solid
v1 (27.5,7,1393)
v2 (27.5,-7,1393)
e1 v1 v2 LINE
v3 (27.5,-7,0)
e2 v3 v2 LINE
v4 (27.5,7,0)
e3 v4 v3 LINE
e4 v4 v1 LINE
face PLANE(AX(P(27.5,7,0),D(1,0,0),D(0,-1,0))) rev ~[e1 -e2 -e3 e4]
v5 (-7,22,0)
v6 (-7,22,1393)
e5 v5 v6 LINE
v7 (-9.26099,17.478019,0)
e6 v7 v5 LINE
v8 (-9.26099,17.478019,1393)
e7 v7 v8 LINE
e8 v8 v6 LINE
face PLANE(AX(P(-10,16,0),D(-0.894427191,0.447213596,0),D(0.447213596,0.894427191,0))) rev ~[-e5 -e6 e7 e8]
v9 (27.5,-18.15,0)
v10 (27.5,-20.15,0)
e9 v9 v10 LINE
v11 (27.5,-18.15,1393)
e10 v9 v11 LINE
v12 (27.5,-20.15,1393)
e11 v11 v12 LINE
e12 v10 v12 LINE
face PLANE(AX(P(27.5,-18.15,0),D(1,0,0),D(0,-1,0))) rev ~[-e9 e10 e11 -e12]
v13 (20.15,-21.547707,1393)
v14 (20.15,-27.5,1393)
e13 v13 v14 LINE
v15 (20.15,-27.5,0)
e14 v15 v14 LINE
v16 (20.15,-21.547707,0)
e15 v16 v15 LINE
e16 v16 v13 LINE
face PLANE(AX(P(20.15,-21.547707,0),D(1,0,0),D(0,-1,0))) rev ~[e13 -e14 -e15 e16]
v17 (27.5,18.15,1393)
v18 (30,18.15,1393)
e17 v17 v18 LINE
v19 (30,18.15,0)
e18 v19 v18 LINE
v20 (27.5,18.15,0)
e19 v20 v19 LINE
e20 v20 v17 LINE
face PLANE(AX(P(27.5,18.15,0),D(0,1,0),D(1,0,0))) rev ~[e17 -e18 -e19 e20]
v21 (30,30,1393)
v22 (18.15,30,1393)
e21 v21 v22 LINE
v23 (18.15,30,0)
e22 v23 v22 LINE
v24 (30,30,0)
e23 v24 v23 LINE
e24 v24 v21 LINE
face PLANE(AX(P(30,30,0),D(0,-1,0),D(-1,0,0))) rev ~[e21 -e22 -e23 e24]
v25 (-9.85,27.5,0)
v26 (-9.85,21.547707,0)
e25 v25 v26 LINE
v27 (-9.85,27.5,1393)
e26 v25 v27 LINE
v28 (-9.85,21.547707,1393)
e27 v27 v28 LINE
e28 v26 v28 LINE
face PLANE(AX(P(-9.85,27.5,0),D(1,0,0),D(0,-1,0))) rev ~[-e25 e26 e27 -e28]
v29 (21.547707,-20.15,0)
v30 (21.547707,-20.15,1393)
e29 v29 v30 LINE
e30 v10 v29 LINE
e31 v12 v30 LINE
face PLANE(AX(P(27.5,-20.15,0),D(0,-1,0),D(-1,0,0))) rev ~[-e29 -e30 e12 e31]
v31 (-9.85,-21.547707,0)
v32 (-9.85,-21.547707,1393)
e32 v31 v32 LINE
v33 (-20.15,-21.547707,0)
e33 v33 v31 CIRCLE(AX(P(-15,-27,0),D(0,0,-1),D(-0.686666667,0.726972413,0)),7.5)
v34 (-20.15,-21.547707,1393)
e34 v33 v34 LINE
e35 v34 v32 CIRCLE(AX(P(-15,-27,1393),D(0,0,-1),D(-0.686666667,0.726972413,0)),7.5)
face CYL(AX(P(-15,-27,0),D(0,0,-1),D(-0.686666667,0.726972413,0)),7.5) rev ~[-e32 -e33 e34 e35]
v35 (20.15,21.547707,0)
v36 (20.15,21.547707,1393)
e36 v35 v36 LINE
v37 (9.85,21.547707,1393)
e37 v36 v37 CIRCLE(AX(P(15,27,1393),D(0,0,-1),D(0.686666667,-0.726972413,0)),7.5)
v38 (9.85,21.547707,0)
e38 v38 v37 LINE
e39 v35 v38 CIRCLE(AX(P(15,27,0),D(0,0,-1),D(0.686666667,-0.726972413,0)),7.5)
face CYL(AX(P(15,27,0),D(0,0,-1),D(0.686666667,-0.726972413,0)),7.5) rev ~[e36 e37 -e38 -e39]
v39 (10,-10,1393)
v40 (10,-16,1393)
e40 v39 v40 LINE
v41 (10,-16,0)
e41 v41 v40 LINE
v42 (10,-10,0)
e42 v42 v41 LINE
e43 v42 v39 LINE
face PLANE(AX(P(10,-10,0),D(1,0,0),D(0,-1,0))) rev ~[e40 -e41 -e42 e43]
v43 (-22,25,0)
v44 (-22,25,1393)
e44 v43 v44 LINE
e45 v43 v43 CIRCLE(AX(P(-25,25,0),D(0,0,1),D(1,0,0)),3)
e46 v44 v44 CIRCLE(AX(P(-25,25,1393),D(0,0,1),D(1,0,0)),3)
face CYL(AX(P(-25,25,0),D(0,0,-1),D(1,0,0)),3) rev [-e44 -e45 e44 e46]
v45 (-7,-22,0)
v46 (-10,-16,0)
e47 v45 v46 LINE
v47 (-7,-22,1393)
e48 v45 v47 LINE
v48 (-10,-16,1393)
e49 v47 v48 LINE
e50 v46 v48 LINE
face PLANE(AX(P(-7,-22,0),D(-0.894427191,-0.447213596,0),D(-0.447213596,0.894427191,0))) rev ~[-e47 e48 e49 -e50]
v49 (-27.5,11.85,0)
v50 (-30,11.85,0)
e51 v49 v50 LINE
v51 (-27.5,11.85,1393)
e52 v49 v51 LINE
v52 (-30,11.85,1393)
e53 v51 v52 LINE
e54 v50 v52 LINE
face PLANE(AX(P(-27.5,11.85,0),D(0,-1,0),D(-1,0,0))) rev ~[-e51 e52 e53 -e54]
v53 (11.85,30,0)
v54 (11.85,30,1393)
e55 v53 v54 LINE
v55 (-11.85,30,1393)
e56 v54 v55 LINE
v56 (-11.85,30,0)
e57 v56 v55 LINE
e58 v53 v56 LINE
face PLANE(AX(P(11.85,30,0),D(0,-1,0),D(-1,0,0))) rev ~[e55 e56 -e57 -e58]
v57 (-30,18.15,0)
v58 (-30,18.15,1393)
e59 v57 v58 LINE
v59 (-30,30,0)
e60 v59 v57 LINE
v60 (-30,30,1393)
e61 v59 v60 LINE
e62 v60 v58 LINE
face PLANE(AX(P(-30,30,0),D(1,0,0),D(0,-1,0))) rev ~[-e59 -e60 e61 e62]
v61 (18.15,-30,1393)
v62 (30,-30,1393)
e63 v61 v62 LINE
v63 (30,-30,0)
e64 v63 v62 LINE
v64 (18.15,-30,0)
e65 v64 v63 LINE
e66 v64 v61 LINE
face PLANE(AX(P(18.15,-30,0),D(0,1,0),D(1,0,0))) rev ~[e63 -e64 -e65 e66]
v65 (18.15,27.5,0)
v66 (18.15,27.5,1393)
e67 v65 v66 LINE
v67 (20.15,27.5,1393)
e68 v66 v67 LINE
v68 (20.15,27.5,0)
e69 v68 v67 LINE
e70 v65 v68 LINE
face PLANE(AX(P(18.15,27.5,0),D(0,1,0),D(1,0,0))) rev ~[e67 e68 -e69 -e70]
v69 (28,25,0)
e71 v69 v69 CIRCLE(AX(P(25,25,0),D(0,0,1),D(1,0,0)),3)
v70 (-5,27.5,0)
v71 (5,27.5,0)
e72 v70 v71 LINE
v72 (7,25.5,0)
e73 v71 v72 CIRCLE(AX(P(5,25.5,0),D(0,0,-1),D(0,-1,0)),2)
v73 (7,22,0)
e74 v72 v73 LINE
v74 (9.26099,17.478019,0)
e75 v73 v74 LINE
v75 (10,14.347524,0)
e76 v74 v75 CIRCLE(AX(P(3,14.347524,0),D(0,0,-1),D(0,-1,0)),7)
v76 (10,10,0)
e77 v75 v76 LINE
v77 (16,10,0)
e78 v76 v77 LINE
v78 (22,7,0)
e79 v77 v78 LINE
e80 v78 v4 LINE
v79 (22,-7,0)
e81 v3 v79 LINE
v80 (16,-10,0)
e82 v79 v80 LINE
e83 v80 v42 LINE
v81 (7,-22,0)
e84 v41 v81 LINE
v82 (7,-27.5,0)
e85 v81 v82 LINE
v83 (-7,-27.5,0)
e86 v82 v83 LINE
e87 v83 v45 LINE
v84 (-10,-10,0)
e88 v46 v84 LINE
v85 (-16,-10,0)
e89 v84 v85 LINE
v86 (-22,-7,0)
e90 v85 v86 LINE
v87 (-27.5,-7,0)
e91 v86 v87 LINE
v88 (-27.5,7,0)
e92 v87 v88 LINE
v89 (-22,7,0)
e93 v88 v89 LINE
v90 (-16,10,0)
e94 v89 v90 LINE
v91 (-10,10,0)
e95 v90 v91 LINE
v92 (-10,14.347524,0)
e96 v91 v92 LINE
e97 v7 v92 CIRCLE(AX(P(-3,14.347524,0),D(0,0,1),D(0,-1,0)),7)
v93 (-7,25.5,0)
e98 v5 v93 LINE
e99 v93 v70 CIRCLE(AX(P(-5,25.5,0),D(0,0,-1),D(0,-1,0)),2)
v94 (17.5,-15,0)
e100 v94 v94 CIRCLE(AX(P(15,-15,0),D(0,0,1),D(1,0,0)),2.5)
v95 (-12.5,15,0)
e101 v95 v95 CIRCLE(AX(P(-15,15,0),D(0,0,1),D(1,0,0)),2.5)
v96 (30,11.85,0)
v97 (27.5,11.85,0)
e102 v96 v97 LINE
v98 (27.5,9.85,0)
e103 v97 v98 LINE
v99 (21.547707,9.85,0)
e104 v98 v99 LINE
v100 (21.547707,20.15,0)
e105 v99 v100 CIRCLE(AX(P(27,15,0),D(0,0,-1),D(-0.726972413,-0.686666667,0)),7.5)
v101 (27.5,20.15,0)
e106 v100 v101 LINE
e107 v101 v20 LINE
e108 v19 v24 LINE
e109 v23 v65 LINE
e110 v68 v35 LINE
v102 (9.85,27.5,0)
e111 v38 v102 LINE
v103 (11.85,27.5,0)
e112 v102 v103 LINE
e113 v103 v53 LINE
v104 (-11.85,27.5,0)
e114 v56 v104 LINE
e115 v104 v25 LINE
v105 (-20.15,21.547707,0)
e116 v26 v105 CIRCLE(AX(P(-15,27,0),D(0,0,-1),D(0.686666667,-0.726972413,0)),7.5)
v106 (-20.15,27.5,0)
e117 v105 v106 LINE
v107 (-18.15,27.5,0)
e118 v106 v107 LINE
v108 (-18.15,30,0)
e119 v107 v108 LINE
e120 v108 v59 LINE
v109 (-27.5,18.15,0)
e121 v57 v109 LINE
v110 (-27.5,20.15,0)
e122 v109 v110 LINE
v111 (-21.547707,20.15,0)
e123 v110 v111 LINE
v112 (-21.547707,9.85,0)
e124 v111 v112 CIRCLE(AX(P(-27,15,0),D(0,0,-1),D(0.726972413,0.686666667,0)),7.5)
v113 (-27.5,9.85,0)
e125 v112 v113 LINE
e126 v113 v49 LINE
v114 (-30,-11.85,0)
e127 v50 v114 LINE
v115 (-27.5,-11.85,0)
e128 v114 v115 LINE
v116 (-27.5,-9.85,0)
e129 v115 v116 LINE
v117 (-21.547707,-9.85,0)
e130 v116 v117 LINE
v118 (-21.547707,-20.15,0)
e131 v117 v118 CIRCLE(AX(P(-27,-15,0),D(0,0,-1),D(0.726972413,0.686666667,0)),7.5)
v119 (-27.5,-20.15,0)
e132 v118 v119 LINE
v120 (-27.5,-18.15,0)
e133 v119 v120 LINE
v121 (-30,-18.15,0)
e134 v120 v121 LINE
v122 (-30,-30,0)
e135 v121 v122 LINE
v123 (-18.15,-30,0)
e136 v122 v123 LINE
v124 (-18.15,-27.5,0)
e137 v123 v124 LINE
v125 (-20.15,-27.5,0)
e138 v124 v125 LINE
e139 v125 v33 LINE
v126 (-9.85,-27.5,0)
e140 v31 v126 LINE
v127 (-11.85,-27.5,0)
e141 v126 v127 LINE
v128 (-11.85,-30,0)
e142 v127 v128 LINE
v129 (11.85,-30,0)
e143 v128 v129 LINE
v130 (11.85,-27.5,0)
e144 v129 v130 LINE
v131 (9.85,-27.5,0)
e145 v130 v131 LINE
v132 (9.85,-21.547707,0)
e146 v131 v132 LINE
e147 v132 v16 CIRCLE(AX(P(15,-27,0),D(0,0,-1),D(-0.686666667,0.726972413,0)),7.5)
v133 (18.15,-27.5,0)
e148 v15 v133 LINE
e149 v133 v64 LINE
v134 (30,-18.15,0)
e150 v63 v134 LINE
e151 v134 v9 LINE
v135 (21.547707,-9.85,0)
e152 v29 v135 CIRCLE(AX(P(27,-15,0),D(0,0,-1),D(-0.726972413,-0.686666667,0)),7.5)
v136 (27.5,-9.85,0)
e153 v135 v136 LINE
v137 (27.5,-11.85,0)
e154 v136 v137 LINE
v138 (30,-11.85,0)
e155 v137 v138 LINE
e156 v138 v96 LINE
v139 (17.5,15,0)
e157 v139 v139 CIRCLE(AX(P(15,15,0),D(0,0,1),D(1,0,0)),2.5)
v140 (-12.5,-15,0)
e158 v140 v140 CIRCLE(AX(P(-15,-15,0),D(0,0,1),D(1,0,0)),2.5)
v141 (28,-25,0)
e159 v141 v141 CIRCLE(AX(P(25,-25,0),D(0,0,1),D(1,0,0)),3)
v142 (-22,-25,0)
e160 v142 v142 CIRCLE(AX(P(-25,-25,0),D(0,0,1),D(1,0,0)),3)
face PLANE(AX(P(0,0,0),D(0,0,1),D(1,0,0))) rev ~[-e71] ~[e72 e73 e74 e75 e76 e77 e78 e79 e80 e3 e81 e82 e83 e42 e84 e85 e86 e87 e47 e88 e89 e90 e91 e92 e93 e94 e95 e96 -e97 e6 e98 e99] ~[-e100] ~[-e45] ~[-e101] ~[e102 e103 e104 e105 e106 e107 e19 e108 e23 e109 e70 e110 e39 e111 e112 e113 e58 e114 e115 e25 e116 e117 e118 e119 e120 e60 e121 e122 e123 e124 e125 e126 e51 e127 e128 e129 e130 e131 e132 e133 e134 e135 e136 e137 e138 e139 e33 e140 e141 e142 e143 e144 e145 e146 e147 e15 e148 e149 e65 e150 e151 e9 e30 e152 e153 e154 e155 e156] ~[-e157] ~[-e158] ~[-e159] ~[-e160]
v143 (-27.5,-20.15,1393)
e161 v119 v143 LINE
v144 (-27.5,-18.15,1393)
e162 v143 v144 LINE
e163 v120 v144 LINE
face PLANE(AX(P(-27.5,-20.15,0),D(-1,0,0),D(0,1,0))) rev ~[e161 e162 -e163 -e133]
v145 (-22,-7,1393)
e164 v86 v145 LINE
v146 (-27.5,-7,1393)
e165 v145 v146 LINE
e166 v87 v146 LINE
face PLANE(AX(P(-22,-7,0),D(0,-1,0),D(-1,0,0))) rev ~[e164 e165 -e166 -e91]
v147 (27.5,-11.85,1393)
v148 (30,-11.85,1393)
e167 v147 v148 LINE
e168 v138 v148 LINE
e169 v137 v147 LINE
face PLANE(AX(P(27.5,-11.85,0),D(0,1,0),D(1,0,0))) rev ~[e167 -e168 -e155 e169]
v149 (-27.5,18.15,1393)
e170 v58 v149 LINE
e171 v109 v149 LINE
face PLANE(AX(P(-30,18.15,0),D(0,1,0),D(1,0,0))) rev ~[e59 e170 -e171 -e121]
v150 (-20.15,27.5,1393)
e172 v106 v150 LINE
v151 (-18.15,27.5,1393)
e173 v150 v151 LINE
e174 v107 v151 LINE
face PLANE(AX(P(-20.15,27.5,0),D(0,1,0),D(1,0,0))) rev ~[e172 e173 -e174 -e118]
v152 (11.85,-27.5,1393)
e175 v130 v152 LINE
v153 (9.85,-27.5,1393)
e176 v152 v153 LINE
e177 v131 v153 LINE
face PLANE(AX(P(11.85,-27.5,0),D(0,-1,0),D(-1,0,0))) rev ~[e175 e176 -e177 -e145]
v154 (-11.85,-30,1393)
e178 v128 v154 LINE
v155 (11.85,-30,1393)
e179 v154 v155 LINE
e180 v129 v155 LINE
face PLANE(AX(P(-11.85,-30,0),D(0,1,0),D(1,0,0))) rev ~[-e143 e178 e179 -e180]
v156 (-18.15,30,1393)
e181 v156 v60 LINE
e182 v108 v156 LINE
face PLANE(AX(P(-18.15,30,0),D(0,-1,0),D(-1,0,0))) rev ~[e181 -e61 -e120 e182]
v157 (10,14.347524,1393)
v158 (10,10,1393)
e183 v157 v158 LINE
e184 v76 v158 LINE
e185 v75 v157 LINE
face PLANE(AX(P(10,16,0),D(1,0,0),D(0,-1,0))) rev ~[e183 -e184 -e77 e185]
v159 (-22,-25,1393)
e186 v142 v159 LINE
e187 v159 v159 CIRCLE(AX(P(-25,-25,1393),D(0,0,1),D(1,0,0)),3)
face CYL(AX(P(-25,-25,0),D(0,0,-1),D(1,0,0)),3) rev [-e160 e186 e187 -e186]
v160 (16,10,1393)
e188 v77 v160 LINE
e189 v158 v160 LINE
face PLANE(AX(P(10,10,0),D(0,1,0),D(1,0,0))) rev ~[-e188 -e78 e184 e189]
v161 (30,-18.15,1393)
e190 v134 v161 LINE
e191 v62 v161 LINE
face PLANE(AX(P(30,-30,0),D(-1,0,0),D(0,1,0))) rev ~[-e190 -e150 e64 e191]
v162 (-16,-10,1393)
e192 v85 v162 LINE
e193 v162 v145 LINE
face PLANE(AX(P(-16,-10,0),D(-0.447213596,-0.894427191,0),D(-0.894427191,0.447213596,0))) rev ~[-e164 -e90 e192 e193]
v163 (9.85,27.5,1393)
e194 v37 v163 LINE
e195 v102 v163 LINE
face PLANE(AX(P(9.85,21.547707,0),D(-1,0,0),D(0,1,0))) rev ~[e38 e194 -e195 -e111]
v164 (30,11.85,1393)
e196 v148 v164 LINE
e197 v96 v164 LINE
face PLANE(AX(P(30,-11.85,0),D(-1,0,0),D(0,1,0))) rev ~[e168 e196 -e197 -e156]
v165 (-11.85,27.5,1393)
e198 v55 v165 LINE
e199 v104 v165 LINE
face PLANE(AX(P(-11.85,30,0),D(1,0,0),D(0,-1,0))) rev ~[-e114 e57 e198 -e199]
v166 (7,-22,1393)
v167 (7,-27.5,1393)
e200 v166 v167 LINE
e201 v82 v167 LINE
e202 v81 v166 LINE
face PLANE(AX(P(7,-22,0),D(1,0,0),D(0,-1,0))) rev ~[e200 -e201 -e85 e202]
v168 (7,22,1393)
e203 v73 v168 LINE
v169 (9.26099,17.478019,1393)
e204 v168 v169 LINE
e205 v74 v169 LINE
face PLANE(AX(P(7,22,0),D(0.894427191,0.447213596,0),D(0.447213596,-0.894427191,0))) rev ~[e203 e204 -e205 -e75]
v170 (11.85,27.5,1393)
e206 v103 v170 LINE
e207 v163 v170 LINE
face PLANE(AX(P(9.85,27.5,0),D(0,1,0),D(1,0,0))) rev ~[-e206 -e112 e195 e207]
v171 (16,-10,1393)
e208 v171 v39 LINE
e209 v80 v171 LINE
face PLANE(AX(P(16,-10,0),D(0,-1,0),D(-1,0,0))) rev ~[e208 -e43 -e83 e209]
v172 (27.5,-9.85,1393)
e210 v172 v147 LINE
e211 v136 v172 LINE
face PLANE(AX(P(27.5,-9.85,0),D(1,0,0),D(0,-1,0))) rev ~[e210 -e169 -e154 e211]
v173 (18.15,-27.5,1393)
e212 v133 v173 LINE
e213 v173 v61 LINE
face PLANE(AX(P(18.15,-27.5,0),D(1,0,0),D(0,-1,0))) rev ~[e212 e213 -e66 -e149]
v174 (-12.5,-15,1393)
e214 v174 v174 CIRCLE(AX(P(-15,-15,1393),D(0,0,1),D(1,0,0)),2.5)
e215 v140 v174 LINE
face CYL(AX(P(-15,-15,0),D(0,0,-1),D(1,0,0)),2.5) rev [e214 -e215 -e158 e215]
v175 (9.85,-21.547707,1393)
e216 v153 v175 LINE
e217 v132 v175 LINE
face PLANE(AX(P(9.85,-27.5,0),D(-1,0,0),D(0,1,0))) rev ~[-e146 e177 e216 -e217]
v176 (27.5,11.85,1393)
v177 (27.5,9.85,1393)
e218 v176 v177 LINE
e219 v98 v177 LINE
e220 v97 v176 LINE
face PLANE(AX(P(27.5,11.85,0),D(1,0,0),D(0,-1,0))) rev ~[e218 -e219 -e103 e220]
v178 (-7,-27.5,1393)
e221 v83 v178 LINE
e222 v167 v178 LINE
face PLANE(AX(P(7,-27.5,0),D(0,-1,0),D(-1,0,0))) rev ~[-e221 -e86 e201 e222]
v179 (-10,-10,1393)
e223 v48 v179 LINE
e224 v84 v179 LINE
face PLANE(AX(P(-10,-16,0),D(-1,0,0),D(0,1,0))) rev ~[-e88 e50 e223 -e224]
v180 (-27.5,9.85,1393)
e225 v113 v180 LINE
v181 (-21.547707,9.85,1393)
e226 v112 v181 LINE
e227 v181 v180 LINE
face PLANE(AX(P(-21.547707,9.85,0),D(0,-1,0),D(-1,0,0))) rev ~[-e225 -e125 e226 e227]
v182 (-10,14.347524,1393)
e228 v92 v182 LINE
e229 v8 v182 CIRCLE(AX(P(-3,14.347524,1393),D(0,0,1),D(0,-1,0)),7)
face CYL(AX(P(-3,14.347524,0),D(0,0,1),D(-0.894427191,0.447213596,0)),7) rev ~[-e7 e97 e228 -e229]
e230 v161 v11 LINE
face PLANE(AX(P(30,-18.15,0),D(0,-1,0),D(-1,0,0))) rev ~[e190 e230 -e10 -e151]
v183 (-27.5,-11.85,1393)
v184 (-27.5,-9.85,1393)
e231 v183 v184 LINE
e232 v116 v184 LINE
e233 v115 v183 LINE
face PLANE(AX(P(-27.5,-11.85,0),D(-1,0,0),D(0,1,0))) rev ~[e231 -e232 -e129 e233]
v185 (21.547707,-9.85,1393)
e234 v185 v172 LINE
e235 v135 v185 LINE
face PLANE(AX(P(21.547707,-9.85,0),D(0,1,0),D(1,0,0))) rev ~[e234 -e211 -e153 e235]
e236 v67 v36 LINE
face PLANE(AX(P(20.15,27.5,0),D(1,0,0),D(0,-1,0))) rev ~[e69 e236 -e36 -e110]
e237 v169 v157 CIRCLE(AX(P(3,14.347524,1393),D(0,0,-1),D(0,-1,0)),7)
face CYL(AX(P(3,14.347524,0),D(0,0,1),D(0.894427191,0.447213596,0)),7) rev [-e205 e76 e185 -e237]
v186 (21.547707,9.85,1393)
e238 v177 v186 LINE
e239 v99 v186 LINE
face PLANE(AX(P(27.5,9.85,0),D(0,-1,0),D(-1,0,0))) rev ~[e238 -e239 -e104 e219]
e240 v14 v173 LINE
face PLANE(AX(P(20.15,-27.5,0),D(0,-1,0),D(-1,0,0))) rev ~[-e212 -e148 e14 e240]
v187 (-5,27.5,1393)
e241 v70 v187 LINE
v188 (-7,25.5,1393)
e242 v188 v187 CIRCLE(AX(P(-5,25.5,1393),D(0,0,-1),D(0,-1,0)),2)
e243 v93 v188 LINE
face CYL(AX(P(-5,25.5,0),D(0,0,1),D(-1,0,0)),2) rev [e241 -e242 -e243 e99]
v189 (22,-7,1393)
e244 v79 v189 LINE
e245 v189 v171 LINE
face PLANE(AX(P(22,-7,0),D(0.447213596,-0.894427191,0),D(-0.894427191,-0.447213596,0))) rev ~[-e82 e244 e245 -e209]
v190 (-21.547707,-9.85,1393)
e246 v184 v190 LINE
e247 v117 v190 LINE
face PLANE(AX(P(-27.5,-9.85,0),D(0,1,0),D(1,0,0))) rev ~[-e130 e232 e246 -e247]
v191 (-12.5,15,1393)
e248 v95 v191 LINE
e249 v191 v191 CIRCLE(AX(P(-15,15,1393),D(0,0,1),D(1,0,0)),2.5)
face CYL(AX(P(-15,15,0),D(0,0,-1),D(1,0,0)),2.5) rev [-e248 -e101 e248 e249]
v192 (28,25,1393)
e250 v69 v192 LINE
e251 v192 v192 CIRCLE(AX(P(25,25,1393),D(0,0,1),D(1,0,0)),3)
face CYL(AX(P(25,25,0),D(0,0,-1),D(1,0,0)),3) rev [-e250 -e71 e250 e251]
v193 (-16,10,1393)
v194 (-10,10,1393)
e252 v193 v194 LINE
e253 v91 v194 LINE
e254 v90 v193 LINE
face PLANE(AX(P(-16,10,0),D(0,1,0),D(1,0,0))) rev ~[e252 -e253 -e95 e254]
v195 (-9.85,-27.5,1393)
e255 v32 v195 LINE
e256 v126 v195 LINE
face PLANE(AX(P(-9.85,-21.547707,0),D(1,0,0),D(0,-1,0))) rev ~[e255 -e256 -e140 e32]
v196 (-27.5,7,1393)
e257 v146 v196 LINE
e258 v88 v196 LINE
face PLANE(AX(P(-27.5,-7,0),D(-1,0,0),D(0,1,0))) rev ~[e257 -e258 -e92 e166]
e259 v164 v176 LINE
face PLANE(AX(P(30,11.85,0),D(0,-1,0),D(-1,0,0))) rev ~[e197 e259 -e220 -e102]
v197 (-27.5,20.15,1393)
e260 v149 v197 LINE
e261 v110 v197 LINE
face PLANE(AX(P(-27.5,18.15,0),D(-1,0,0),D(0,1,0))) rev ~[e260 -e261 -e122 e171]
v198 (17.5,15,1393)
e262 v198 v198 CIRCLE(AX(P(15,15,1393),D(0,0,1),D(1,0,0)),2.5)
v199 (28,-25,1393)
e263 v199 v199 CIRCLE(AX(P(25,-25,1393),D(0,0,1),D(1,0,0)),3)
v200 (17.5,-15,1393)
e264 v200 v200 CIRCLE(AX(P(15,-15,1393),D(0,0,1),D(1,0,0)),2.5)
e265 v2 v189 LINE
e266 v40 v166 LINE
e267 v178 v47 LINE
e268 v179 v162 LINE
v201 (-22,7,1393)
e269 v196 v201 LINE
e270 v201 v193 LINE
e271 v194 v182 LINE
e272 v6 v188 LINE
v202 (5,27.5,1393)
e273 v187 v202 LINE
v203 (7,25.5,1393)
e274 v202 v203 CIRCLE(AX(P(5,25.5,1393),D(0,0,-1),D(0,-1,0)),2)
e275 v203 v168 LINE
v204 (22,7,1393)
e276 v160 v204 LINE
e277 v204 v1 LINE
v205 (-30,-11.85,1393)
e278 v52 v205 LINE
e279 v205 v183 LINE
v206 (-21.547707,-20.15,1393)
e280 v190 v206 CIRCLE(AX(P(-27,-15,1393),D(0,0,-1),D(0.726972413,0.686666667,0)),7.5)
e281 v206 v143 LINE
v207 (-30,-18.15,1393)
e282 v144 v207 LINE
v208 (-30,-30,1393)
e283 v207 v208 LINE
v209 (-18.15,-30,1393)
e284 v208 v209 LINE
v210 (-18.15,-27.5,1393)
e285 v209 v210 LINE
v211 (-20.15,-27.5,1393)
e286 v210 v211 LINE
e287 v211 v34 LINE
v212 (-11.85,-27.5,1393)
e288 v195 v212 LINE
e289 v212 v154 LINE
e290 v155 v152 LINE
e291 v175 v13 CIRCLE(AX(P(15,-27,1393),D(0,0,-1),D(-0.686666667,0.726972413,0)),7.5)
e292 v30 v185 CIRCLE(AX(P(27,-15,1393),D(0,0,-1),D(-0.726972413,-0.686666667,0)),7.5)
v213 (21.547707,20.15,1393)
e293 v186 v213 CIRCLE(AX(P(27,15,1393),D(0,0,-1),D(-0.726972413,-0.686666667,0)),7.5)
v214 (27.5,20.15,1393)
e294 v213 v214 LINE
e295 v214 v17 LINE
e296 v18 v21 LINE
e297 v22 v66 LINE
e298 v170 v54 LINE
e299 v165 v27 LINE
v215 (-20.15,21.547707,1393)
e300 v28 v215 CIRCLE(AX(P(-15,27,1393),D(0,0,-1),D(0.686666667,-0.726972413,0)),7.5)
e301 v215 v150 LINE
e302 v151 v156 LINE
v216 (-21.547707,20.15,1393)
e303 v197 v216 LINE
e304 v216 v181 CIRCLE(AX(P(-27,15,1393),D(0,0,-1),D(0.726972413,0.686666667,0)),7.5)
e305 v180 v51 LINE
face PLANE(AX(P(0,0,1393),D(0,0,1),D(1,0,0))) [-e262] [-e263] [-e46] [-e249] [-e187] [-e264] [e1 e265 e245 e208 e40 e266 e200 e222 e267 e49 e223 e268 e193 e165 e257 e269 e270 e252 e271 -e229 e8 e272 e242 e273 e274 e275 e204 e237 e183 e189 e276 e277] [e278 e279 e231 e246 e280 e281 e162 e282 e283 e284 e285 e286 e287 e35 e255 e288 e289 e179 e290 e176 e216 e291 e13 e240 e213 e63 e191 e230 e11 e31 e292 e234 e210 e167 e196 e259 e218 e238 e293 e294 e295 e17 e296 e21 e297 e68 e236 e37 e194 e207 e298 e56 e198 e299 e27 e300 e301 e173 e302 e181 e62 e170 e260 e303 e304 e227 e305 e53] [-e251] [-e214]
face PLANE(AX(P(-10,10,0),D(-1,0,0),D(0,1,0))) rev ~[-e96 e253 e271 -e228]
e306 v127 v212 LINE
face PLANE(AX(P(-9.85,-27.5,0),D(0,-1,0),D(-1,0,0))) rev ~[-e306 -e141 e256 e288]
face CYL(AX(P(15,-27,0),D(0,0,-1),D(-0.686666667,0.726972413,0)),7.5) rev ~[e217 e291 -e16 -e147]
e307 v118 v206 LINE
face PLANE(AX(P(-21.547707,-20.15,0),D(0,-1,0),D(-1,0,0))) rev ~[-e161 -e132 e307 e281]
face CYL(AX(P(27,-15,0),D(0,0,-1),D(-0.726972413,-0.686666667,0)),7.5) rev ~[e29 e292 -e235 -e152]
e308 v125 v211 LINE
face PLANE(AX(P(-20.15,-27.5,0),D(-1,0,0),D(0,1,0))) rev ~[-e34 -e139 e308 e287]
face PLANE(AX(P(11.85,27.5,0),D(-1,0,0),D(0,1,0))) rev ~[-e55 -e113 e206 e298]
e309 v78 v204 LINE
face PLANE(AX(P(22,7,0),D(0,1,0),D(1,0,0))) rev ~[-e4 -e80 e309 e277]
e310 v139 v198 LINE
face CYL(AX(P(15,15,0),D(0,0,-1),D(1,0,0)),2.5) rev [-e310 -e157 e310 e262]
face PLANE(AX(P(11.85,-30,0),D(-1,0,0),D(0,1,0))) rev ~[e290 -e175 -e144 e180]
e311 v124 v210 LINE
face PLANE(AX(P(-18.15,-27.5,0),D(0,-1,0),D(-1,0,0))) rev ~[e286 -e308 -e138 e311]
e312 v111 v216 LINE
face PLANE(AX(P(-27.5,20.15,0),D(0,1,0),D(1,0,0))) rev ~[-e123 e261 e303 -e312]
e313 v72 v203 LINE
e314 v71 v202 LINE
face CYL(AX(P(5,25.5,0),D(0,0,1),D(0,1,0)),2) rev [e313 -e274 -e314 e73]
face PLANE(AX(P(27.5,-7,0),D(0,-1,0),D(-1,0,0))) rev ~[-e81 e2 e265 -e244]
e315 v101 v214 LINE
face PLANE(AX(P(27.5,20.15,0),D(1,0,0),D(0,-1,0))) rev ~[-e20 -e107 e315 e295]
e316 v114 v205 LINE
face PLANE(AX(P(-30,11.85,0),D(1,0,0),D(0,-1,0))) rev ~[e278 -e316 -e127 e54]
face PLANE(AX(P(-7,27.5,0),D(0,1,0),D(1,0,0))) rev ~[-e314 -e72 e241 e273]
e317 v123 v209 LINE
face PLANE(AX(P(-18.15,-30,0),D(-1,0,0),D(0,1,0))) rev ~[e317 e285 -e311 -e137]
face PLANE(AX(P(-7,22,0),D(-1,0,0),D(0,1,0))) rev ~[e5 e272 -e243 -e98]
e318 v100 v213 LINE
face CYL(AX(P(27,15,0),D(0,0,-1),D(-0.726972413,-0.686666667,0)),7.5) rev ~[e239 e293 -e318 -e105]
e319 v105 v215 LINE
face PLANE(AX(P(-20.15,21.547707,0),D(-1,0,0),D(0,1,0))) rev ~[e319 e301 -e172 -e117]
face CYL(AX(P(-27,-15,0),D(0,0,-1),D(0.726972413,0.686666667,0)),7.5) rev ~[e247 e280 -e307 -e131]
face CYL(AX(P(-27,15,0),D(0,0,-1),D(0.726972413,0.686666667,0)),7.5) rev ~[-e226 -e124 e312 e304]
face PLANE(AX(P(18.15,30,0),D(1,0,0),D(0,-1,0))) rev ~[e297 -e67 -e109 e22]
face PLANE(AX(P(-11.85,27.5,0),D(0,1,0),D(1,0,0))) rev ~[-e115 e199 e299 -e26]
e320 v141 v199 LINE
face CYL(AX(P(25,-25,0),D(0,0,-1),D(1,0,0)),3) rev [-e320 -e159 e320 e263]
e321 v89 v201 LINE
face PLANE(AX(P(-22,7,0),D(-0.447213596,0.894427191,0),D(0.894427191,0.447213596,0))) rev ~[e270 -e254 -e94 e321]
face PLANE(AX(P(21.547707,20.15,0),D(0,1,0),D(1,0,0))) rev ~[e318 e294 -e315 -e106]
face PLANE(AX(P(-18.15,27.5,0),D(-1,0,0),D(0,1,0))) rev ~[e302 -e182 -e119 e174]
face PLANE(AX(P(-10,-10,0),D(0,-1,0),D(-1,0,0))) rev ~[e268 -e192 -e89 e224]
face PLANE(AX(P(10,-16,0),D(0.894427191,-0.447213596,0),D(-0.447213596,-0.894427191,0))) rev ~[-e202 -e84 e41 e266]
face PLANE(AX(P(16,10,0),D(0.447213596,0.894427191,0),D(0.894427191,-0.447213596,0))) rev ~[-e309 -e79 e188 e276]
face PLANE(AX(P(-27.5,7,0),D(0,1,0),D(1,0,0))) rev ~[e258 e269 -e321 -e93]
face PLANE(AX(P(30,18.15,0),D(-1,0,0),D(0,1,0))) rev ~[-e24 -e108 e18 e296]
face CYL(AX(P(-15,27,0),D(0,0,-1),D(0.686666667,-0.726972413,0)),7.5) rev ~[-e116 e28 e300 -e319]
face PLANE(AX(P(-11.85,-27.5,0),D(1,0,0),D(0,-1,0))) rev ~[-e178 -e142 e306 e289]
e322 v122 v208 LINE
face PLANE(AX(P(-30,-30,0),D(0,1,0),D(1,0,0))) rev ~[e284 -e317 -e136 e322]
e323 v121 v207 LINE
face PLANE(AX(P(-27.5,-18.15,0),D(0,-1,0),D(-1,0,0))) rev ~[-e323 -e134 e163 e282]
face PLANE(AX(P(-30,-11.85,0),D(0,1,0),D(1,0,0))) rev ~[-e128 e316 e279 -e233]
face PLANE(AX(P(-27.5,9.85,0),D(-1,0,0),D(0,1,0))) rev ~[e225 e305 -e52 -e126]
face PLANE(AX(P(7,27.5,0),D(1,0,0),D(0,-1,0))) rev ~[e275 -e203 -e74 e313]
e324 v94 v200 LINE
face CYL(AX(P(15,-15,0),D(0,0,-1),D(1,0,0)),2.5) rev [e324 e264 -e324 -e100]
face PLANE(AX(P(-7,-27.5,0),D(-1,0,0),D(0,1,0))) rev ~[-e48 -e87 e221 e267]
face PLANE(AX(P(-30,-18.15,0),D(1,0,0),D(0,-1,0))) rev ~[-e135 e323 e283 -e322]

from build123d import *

# Parameters (mm, degrees)
F0_R     = 3
F0_R_2   = 2.5
F1_DEPTH = 1393
F2_R     = 2
F3_R     = 7


# Not quite as in the source:
# - a feature names something its author has since deleted; it is built from what else it names


with BuildPart() as f1:
    # F0 (on Top) → F1 (new body)
    with BuildSketch(Plane.XY):
        with BuildLine():
            Line((18.15, -30), (30, -30))
            Line((30, -30), (30, -18.15))
            Line((30, -18.15), (27.5, -18.15))
            Line((27.5, -18.15), (27.5, -20.15))
            Line((27.5, -20.15), (21.5477069044, -20.15))
            ThreePointArc((21.5477069044, -20.15), (19.5, -15), (21.5477069044, -9.85))
            Line((21.5477069044, -9.85), (27.5, -9.85))
            Line((27.5, -9.85), (27.5, -11.85))
            Line((27.5, -11.85), (30, -11.85))
            Line((30, -11.85), (30, 11.85))
            Line((30, 11.85), (27.5, 11.85))
            Line((27.5, 11.85), (27.5, 9.85))
            Line((27.5, 9.85), (21.5477069044, 9.85))
            ThreePointArc((21.5477069044, 9.85), (19.5, 15), (21.5477069044, 20.15))
            Line((21.5477069044, 20.15), (27.5, 20.15))
            Line((27.5, 20.15), (27.5, 18.15))
            Line((27.5, 18.15), (30, 18.15))
            Line((30, 18.15), (30, 30))
            Line((30, 30), (18.15, 30))
            Line((18.15, 30), (18.15, 27.5))
            Line((18.15, 27.5), (20.15, 27.5))
            Line((20.15, 27.5), (20.15, 21.5477069044))
            ThreePointArc((20.15, 21.5477069044), (15, 19.5), (9.85, 21.5477069044))
            Line((9.85, 21.5477069044), (9.85, 27.5))
            Line((9.85, 27.5), (11.85, 27.5))
            Line((11.85, 27.5), (11.85, 30))
            Line((11.85, 30), (-11.85, 30))
            Line((-11.85, 30), (-11.85, 27.5))
            Line((-11.85, 27.5), (-9.85, 27.5))
            Line((-9.85, 27.5), (-9.85, 21.5477069044))
            ThreePointArc((-9.85, 21.5477069044), (-15, 19.5), (-20.15, 21.5477069044))
            Line((-20.15, 21.5477069044), (-20.15, 27.5))
            Line((-20.15, 27.5), (-18.15, 27.5))
            Line((-18.15, 27.5), (-18.15, 30))
            Line((-18.15, 30), (-30, 30))
            Line((-30, 30), (-30, 18.15))
            Line((-30, 18.15), (-27.5, 18.15))
            Line((-27.5, 18.15), (-27.5, 20.15))
            Line((-27.5, 20.15), (-21.5477069044, 20.15))
            ThreePointArc((-21.5477069044, 20.15), (-19.5, 15), (-21.5477069044, 9.85))
            Line((-21.5477069044, 9.85), (-27.5, 9.85))
            Line((-27.5, 9.85), (-27.5, 11.85))
            Line((-27.5, 11.85), (-30, 11.85))
            Line((-30, 11.85), (-30, -11.85))
            Line((-30, -11.85), (-27.5, -11.85))
            Line((-27.5, -11.85), (-27.5, -9.85))
            Line((-27.5, -9.85), (-21.5477069044, -9.85))
            ThreePointArc((-21.5477069044, -9.85), (-19.5, -15), (-21.5477069044, -20.15))
            Line((-21.5477069044, -20.15), (-27.5, -20.15))
            Line((-27.5, -20.15), (-27.5, -18.15))
            Line((-27.5, -18.15), (-30, -18.15))
            Line((-30, -18.15), (-30, -30))
            Line((-30, -30), (-18.15, -30))
            Line((-18.15, -30), (-18.15, -27.5))
            Line((-18.15, -27.5), (-20.15, -27.5))
            Line((-20.15, -27.5), (-20.15, -21.5477069044))
            ThreePointArc((-20.15, -21.5477069044), (-15, -19.5), (-9.85, -21.5477069044))
            Line((-9.85, -21.5477069044), (-9.85, -27.5))
            Line((-9.85, -27.5), (-11.85, -27.5))
            Line((-11.85, -27.5), (-11.85, -30))
            Line((-11.85, -30), (11.85, -30))
            Line((11.85, -30), (11.85, -27.5))
            Line((11.85, -27.5), (9.85, -27.5))
            Line((9.85, -27.5), (9.85, -21.5477069044))
            ThreePointArc((9.85, -21.5477069044), (15, -19.5), (20.15, -21.5477069044))
            Line((20.15, -21.5477069044), (20.15, -27.5))
            Line((20.15, -27.5), (18.15, -27.5))
            Line((18.15, -27.5), (18.15, -30))
        make_face()
        with Locations((-25, -25)):
            Circle(F0_R, mode=Mode.SUBTRACT)
        with Locations((-15, -15)):
            Circle(F0_R_2, mode=Mode.SUBTRACT)
        with Locations((25, -25)):
            Circle(F0_R, mode=Mode.SUBTRACT)
        with Locations((15, -15)):
            Circle(F0_R_2, mode=Mode.SUBTRACT)
        with Locations((-25, 25)):
            Circle(F0_R, mode=Mode.SUBTRACT)
        with Locations((-15, 15)):
            Circle(F0_R_2, mode=Mode.SUBTRACT)
        Polygon((-7, 22), (-7, 27.5), (0, 27.5), (7, 27.5), (7, 22), (10, 16), (10, 10), (16, 10), (22, 7), (27.5, 7), (27.5, 0), (27.5, -7), (22, -7), (16, -10), (10, -10), (10, -16), (7, -22), (7, -27.5), (0, -27.5), (-7, -27.5), (-7, -22), (-10, -16), (-10, -10), (-16, -10), (-22, -7), (-27.5, -7), (-27.5, 0), (-27.5, 7), (-22, 7), (-16, 10), (-10, 10), (-10, 16), align=None, mode=Mode.SUBTRACT)
        with Locations((15, 15)):
            Circle(F0_R_2, mode=Mode.SUBTRACT)
        with Locations((25, 25)):
            Circle(F0_R, mode=Mode.SUBTRACT)
    extrude(amount=F1_DEPTH)

    # F2
    f2_edges = [f1.edges().sort_by_distance(p)[0] for p in [
        (-7, 27.5, 696.5),
        (7, 27.5, 696.5),
    ]]
    fillet(f2_edges, radius=F2_R)

    # F3
    f3_edges = [f1.edges().sort_by_distance(p)[0] for p in [
        (-10, 16, 696.5),
        (10, 16, 696.5),
    ]]
    fillet(f3_edges, radius=F3_R)


solid = f1.part
